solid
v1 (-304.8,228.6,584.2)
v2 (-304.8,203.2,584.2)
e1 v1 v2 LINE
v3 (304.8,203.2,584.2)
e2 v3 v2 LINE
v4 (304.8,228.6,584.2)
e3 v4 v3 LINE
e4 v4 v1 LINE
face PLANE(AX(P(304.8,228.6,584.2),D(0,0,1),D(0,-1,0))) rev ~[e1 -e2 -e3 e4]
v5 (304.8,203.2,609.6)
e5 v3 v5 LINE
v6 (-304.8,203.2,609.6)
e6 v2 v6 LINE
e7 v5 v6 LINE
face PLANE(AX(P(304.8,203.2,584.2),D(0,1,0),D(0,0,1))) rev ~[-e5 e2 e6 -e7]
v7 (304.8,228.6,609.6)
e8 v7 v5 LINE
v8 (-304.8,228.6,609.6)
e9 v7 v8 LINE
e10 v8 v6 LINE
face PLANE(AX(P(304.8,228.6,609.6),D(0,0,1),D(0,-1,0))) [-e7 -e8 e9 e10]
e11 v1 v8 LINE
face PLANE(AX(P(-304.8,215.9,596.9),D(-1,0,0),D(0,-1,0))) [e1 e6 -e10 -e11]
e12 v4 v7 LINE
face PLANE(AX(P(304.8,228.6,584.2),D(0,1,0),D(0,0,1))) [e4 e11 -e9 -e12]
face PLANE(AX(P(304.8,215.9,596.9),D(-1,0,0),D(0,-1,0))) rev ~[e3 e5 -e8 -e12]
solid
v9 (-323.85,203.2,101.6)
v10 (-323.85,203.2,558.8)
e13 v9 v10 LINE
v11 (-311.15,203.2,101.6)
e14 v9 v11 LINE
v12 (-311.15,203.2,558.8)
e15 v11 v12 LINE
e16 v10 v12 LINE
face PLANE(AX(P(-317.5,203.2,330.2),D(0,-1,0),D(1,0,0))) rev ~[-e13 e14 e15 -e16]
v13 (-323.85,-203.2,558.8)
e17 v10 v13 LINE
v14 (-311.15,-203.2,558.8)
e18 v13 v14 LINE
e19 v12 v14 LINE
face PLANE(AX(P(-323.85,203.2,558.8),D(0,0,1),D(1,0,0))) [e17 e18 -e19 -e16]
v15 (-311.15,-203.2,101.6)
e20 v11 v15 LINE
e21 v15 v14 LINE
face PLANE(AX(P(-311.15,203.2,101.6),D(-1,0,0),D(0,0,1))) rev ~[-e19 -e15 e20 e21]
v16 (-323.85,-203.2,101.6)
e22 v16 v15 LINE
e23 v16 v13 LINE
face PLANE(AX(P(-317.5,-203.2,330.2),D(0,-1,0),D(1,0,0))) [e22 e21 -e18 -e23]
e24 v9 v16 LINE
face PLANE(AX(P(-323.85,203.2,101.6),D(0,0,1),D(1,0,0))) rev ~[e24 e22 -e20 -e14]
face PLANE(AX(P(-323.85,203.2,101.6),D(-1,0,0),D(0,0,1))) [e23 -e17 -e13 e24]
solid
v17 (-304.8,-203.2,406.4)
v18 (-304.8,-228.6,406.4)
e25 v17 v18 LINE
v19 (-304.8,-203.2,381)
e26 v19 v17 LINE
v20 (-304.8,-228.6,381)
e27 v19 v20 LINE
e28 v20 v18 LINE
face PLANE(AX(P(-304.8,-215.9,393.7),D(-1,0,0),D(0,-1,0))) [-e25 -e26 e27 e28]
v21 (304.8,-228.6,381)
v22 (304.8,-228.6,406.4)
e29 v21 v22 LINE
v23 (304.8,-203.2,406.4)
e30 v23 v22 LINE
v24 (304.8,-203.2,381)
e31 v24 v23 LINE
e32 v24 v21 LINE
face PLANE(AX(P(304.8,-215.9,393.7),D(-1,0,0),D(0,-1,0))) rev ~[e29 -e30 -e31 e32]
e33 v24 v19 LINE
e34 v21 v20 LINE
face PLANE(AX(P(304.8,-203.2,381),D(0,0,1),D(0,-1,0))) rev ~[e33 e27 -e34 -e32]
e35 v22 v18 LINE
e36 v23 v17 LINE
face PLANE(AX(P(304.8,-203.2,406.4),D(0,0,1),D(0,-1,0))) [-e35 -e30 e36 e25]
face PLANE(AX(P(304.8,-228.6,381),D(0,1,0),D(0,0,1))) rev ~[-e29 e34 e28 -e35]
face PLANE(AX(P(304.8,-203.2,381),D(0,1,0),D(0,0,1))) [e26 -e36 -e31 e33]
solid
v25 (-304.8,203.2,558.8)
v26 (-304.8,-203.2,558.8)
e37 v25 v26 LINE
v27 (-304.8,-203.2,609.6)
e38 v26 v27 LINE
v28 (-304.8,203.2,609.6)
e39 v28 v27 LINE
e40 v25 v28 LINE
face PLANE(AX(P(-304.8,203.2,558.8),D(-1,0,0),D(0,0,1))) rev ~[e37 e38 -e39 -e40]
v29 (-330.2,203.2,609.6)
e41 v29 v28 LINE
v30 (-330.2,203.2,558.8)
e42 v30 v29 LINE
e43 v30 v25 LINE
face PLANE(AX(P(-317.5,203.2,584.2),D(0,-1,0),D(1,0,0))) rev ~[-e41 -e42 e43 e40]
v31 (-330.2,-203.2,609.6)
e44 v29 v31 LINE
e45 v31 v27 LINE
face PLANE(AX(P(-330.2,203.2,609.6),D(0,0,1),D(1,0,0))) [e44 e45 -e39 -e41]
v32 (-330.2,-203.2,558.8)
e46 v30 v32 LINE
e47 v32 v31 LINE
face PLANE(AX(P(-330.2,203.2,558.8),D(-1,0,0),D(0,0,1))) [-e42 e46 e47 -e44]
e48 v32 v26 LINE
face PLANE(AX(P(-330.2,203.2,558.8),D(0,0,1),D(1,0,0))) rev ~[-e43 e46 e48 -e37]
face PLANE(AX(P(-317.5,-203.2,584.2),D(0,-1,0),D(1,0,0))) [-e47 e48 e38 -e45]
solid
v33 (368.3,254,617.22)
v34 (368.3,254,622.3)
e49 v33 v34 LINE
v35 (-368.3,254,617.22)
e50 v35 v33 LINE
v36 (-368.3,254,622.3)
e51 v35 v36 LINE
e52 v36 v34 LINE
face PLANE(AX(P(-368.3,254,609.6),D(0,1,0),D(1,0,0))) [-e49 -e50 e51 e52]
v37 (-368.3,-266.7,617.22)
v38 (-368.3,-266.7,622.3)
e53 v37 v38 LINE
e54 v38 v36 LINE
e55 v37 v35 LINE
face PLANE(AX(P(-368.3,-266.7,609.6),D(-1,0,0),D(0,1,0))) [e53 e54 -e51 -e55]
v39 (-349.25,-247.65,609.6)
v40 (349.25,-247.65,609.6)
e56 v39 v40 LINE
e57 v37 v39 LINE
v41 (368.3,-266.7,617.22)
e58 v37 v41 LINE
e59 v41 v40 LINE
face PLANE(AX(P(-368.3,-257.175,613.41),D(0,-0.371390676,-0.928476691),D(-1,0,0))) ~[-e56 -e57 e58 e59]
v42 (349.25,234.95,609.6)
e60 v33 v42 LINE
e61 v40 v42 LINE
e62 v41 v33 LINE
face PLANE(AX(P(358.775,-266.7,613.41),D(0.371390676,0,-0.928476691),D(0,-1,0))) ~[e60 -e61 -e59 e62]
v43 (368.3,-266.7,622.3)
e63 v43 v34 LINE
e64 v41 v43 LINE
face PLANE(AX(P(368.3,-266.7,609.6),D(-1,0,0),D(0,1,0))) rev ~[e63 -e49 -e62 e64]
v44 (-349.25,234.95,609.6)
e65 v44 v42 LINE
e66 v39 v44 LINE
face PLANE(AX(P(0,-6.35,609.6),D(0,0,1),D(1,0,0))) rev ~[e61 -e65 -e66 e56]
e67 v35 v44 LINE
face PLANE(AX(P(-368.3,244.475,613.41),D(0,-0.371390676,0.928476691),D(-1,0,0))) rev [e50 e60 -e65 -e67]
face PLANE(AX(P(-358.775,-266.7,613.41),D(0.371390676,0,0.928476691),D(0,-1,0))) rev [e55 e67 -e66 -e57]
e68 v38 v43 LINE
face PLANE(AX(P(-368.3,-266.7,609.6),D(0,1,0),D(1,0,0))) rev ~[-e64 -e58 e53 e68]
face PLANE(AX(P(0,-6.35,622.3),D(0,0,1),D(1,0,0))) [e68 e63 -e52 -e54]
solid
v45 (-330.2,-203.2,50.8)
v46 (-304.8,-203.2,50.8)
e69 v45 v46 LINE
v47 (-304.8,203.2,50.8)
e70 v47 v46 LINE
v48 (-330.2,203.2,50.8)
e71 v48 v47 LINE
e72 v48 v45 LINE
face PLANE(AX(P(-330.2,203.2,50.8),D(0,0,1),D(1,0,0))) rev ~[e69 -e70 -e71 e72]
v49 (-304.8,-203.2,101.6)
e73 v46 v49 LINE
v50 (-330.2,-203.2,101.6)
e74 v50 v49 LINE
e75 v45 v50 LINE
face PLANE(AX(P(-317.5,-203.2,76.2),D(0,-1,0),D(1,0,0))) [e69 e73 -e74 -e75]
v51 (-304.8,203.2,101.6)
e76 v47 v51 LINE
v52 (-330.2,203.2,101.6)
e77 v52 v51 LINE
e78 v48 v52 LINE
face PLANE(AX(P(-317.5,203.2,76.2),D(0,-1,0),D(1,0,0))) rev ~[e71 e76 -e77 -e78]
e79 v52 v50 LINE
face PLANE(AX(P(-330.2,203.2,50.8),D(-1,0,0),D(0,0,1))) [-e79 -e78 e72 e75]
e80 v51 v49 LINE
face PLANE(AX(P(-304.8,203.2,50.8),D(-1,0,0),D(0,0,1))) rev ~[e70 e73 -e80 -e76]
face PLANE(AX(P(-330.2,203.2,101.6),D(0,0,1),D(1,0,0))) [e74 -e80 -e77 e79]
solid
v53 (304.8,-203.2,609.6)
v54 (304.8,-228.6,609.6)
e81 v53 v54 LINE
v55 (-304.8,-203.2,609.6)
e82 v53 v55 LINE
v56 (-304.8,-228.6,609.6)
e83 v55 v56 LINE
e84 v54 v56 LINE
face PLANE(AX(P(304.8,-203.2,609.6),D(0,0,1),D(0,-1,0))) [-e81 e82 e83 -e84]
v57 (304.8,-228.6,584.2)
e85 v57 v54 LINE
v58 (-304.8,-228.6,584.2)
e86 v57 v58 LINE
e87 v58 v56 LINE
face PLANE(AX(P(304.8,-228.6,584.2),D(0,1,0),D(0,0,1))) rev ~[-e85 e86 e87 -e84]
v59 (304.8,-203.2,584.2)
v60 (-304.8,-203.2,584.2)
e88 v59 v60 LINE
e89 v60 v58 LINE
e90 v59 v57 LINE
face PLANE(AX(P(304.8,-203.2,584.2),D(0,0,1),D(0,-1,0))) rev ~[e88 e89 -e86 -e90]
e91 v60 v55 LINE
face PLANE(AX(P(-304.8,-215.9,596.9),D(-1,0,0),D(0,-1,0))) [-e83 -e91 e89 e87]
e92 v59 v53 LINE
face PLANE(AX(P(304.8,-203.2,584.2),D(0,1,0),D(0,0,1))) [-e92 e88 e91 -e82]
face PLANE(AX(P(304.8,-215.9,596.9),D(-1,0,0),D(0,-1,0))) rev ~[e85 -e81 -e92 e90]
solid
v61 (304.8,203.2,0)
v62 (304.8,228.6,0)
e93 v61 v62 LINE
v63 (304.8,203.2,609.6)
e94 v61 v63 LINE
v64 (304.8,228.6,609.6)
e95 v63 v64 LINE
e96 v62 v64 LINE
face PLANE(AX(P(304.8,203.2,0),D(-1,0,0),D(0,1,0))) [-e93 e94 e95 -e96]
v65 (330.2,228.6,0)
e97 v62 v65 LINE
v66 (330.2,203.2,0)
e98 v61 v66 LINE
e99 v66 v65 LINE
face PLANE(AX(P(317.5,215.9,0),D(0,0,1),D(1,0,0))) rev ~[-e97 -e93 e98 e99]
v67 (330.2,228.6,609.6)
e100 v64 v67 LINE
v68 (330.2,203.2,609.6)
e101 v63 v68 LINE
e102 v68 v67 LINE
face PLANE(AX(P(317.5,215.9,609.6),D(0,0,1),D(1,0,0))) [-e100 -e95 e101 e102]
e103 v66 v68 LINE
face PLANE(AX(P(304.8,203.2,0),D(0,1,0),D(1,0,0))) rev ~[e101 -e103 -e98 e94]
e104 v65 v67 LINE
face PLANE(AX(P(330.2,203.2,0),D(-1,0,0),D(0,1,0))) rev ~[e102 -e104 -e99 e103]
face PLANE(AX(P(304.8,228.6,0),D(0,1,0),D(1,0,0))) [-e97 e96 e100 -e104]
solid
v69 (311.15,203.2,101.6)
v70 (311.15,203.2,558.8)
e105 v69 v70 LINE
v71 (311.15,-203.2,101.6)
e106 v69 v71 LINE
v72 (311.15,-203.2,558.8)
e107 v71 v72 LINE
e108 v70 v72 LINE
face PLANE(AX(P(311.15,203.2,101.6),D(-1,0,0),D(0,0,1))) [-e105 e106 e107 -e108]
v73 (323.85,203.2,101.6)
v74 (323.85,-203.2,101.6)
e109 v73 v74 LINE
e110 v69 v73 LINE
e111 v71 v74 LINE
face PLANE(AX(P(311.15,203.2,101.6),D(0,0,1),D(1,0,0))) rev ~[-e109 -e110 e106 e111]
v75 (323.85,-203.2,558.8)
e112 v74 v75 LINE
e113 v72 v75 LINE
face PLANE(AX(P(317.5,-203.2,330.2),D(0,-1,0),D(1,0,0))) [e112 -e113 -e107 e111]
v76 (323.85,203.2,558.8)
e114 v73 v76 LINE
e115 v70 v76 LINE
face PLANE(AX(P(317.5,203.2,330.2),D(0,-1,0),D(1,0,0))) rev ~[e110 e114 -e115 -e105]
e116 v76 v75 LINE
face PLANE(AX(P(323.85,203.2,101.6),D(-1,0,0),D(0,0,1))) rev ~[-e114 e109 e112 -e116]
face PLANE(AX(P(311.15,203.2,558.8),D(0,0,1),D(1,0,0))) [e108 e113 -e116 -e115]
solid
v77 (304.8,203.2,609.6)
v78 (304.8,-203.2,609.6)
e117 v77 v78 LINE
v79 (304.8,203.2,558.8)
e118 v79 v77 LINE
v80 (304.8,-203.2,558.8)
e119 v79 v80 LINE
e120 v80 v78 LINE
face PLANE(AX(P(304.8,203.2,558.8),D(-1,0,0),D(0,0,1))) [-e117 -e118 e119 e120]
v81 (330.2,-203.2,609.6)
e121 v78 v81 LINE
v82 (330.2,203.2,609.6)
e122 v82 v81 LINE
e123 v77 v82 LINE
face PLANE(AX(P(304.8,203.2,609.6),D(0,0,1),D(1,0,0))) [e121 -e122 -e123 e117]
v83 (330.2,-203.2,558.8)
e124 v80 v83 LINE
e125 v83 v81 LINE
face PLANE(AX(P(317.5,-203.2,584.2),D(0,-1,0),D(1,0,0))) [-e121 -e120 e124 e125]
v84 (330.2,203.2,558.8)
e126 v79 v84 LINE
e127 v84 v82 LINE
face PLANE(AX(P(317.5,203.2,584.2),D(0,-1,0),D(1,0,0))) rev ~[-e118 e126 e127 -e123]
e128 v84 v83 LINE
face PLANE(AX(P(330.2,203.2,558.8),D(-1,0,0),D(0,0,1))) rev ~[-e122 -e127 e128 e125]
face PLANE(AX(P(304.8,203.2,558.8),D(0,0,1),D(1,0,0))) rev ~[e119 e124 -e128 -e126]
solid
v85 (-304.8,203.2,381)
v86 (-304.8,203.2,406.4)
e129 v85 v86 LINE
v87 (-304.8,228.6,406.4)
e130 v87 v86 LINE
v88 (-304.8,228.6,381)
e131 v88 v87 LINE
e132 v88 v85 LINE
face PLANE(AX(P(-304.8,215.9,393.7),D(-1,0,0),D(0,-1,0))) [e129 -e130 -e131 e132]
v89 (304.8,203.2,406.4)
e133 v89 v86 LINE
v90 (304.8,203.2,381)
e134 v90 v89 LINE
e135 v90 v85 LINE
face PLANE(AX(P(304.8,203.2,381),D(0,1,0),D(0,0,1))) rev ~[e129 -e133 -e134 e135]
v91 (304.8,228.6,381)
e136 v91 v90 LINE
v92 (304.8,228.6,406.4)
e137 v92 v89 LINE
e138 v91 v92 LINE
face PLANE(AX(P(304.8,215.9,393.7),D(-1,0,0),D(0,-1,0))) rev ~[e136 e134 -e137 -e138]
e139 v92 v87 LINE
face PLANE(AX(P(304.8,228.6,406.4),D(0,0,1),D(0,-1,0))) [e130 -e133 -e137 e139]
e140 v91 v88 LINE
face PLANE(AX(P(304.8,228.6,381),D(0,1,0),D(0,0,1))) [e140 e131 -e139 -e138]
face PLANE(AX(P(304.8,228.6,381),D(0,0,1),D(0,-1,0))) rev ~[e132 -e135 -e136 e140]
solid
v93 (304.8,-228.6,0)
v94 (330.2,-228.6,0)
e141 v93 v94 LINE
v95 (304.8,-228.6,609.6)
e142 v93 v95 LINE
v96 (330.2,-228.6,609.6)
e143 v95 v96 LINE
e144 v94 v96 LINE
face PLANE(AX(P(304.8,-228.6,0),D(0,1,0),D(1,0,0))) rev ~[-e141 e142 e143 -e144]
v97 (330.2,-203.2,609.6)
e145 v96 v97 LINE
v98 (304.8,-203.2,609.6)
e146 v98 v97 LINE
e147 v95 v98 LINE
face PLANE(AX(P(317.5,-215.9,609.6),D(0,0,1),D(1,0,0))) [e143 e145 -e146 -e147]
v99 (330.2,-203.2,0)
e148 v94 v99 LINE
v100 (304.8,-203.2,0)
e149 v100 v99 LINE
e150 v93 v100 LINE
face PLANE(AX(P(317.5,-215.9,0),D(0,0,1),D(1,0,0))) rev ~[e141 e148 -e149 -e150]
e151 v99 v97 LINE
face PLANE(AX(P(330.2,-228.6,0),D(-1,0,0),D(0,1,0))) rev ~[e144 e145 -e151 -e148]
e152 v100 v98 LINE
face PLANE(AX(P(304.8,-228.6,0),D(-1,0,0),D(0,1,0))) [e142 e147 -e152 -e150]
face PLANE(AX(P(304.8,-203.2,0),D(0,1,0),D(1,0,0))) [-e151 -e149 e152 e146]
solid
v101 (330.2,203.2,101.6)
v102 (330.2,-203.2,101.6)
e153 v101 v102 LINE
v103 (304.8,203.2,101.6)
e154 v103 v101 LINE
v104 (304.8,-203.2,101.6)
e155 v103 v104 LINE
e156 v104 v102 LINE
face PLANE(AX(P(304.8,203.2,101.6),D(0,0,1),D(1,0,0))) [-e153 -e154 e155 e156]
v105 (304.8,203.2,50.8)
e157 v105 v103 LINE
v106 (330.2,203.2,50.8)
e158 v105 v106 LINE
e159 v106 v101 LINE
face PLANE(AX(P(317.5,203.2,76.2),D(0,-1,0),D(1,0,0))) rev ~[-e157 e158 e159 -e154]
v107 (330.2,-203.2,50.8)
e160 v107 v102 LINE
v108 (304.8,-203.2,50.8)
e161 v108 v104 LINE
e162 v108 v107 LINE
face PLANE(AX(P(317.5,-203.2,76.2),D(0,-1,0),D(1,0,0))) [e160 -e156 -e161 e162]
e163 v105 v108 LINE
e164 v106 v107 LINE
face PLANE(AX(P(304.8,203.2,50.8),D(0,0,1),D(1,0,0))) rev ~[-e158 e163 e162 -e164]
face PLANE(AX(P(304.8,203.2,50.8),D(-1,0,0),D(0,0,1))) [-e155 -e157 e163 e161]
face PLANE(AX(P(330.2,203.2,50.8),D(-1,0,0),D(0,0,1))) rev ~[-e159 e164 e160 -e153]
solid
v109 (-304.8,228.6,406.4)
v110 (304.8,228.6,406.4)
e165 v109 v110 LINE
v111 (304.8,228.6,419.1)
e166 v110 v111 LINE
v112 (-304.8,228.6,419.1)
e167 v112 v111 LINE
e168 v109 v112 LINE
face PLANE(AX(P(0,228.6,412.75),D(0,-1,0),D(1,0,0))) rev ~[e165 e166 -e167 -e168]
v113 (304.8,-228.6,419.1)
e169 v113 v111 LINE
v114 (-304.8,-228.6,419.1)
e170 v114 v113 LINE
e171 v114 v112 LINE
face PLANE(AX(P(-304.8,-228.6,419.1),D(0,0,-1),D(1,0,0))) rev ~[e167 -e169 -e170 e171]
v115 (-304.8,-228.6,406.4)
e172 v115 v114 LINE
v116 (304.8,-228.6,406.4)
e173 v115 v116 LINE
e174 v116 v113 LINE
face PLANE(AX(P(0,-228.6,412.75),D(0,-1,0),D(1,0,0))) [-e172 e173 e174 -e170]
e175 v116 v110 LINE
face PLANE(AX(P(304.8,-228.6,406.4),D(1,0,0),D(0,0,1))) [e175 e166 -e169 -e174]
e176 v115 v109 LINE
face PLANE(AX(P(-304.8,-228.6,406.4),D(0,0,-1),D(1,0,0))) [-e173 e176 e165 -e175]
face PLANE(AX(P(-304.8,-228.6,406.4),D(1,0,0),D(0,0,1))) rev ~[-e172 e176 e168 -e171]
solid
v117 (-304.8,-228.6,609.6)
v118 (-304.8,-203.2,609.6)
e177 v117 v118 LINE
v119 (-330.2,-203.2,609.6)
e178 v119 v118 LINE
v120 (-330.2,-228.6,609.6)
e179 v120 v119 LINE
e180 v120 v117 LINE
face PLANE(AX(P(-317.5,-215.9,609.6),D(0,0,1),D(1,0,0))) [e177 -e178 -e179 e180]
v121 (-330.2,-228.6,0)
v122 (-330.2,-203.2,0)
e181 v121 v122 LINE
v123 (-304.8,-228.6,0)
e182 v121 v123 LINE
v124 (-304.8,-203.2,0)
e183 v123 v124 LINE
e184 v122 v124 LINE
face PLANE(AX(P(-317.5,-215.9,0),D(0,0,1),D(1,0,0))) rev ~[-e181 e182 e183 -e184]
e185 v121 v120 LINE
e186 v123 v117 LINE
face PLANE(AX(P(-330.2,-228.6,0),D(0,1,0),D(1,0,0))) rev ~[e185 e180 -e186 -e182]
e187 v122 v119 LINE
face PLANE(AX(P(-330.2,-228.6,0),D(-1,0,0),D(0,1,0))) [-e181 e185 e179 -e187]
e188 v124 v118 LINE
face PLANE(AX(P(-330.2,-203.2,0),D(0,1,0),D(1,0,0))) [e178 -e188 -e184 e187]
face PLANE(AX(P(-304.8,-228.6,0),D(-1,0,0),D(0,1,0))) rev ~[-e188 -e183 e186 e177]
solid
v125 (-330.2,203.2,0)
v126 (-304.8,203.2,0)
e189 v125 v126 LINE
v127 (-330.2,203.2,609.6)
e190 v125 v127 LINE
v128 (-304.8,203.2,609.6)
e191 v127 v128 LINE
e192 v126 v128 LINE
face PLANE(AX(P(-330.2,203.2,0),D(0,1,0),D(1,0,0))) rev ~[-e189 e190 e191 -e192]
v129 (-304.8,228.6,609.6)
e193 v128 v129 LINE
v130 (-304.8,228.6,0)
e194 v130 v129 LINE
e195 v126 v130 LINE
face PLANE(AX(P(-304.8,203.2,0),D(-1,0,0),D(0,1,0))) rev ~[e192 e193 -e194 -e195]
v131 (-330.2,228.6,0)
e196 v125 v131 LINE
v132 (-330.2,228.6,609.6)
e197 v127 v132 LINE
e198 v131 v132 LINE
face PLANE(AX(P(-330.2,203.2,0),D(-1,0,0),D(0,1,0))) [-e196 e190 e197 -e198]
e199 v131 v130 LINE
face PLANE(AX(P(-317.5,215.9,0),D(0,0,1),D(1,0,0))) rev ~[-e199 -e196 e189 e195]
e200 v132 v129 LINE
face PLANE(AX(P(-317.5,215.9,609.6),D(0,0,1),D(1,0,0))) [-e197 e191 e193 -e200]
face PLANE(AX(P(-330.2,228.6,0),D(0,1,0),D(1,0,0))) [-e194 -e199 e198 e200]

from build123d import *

# Parameters (mm, degrees)
F0_W      = 25.4
F0_H      = 25.4
F1_DEPTH  = 609.6
F2_W      = 25.4
F2_H      = 50.8
F3_DEPTH  = 406.4
F4_W      = 12.7
F4_H      = 457.2
F5_DEPTH  = 406.4
F6_W      = 25.4
F6_H      = 25.4
F7_DEPTH  = 609.6
F8_W      = 609.6
F8_H      = 12.7
F9_DEPTH  = 457.2
F10_W     = 736.6
F10_H     = 520.7
F10_W_2   = 25.4
F10_H_2   = 406.4
F11_DEPTH = 12.7
F12_SIZE2 = 19.05
F12_SIZE  = 7.62


with BuildPart() as f1:
    # F0 (on Top) → F1 (new body)
    with BuildSketch(Plane.XY):
        with Locations((-317.5, 215.9)):
            Rectangle(F0_W, F0_H)
    extrude(amount=F1_DEPTH)


with BuildPart() as f1b:
    # F0 (on Top) → F1, piece 2 (new body)
    with BuildSketch(Plane.XY):
        with Locations((317.5, 215.9)):
            Rectangle(F0_W, F0_H)
    extrude(amount=F1_DEPTH)


with BuildPart() as f1c:
    # F0 (on Top) → F1, piece 3 (new body)
    with BuildSketch(Plane.XY):
        with Locations((317.5, -215.9)):
            Rectangle(F0_W, F0_H)
    extrude(amount=F1_DEPTH)


with BuildPart() as f1d:
    # F0 (on Top) → F1, piece 4 (new body)
    with BuildSketch(Plane.XY):
        with Locations((-317.5, -215.9)):
            Rectangle(F0_W, F0_H)
    extrude(amount=F1_DEPTH)


with BuildPart() as f3:
    # F2 (on face) → F3 (new body, through all)
    with BuildSketch(Plane.XZ.offset(-203.2)):
        with Locations((-317.5, 584.2)):
            Rectangle(F2_W, F2_H)
    extrude(amount=F3_DEPTH)


with BuildPart() as f3b:
    # F2 (on face) → F3, piece 2 (new body, through all)
    with BuildSketch(Plane.XZ.offset(-203.2)):
        with Locations((317.5, 584.2)):
            Rectangle(F2_W, F2_H)
    extrude(amount=F3_DEPTH)


with BuildPart() as f3c:
    # F2 (on face) → F3, piece 3 (new body, through all)
    with BuildSketch(Plane.XZ.offset(-203.2)):
        with Locations((317.5, 76.2)):
            Rectangle(F2_W, F2_H)
    extrude(amount=F3_DEPTH)


with BuildPart() as f3d:
    # F2 (on face) → F3, piece 4 (new body, through all)
    with BuildSketch(Plane.XZ.offset(-203.2)):
        with Locations((-317.5, 76.2)):
            Rectangle(F2_W, F2_H)
    extrude(amount=F3_DEPTH)


with BuildPart() as f5:
    # F4 (on face) → F5 (new body, through all)
    with BuildSketch(Plane.XZ.offset(-203.2)):
        with Locations((317.5, 330.2)):
            Rectangle(F4_W, F4_H)
    extrude(amount=F5_DEPTH)


with BuildPart() as f5b:
    # F4 (on face) → F5, piece 2 (new body, through all)
    with BuildSketch(Plane.XZ.offset(-203.2)):
        with Locations((-317.5, 330.2)):
            Rectangle(F4_W, F4_H)
    extrude(amount=F5_DEPTH)


with BuildPart() as f7:
    # F6 (on face) → F7 (new body, through all)
    with BuildSketch(Plane(origin=(304.8, 0, 0), x_dir=(0, -1, 0), z_dir=(-1, 0, 0))):
        with Locations((-215.9, 596.9)):
            Rectangle(F6_W, F6_H)
    extrude(amount=F7_DEPTH)


with BuildPart() as f7b:
    # F6 (on face) → F7, piece 2 (new body, through all)
    with BuildSketch(Plane(origin=(304.8, 0, 0), x_dir=(0, -1, 0), z_dir=(-1, 0, 0))):
        with Locations((-215.9, 393.7)):
            Rectangle(F6_W, F6_H)
    extrude(amount=F7_DEPTH)


with BuildPart() as f7c:
    # F6 (on face) → F7, piece 3 (new body, through all)
    with BuildSketch(Plane(origin=(304.8, 0, 0), x_dir=(0, -1, 0), z_dir=(-1, 0, 0))):
        with Locations((215.9, 393.7)):
            Rectangle(F6_W, F6_H)
    extrude(amount=F7_DEPTH)


with BuildPart() as f7d:
    # F6 (on face) → F7, piece 4 (new body, through all)
    with BuildSketch(Plane(origin=(304.8, 0, 0), x_dir=(0, -1, 0), z_dir=(-1, 0, 0))):
        with Locations((215.9, 596.9)):
            Rectangle(F6_W, F6_H)
    extrude(amount=F7_DEPTH)


with BuildPart() as f9:
    # F8 (on face) → F9 (new body, through all)
    with BuildSketch(Plane.XZ.offset(228.6)):
        with Locations((0, 412.75)):
            Rectangle(F8_W, F8_H)
    extrude(amount=-F9_DEPTH)


with BuildPart() as f11:
    # F10 (on face) → F11 (new body)
    with BuildSketch(Plane.XY.offset(609.6)):
        with Locations((0, -6.35)):
            Rectangle(F10_W, F10_H)
        with Locations((-317.5, 0)):
            Rectangle(F10_W_2, F10_H_2, mode=Mode.SUBTRACT)
        with Locations((-317.5, 0)):
            Rectangle(F10_W_2, F10_H_2)
    extrude(amount=F11_DEPTH)

    # F12
    f12_edges = [f11.edges().sort_by_distance(p)[0] for p in [
        (0, -266.7, 609.6),
        (-368.3, -6.35, 609.6),
        (368.3, -6.35, 609.6),
        (0, 254, 609.6),
    ]]
    chamfer(f12_edges, length=F12_SIZE, length2=F12_SIZE2)


solid = Compound([f1.part, f1b.part, f1c.part, f1d.part, f3.part, f3b.part, f3c.part, f3d.part, f5.part, f5b.part, f7.part, f7b.part, f7c.part, f7d.part, f9.part, f11.part])
